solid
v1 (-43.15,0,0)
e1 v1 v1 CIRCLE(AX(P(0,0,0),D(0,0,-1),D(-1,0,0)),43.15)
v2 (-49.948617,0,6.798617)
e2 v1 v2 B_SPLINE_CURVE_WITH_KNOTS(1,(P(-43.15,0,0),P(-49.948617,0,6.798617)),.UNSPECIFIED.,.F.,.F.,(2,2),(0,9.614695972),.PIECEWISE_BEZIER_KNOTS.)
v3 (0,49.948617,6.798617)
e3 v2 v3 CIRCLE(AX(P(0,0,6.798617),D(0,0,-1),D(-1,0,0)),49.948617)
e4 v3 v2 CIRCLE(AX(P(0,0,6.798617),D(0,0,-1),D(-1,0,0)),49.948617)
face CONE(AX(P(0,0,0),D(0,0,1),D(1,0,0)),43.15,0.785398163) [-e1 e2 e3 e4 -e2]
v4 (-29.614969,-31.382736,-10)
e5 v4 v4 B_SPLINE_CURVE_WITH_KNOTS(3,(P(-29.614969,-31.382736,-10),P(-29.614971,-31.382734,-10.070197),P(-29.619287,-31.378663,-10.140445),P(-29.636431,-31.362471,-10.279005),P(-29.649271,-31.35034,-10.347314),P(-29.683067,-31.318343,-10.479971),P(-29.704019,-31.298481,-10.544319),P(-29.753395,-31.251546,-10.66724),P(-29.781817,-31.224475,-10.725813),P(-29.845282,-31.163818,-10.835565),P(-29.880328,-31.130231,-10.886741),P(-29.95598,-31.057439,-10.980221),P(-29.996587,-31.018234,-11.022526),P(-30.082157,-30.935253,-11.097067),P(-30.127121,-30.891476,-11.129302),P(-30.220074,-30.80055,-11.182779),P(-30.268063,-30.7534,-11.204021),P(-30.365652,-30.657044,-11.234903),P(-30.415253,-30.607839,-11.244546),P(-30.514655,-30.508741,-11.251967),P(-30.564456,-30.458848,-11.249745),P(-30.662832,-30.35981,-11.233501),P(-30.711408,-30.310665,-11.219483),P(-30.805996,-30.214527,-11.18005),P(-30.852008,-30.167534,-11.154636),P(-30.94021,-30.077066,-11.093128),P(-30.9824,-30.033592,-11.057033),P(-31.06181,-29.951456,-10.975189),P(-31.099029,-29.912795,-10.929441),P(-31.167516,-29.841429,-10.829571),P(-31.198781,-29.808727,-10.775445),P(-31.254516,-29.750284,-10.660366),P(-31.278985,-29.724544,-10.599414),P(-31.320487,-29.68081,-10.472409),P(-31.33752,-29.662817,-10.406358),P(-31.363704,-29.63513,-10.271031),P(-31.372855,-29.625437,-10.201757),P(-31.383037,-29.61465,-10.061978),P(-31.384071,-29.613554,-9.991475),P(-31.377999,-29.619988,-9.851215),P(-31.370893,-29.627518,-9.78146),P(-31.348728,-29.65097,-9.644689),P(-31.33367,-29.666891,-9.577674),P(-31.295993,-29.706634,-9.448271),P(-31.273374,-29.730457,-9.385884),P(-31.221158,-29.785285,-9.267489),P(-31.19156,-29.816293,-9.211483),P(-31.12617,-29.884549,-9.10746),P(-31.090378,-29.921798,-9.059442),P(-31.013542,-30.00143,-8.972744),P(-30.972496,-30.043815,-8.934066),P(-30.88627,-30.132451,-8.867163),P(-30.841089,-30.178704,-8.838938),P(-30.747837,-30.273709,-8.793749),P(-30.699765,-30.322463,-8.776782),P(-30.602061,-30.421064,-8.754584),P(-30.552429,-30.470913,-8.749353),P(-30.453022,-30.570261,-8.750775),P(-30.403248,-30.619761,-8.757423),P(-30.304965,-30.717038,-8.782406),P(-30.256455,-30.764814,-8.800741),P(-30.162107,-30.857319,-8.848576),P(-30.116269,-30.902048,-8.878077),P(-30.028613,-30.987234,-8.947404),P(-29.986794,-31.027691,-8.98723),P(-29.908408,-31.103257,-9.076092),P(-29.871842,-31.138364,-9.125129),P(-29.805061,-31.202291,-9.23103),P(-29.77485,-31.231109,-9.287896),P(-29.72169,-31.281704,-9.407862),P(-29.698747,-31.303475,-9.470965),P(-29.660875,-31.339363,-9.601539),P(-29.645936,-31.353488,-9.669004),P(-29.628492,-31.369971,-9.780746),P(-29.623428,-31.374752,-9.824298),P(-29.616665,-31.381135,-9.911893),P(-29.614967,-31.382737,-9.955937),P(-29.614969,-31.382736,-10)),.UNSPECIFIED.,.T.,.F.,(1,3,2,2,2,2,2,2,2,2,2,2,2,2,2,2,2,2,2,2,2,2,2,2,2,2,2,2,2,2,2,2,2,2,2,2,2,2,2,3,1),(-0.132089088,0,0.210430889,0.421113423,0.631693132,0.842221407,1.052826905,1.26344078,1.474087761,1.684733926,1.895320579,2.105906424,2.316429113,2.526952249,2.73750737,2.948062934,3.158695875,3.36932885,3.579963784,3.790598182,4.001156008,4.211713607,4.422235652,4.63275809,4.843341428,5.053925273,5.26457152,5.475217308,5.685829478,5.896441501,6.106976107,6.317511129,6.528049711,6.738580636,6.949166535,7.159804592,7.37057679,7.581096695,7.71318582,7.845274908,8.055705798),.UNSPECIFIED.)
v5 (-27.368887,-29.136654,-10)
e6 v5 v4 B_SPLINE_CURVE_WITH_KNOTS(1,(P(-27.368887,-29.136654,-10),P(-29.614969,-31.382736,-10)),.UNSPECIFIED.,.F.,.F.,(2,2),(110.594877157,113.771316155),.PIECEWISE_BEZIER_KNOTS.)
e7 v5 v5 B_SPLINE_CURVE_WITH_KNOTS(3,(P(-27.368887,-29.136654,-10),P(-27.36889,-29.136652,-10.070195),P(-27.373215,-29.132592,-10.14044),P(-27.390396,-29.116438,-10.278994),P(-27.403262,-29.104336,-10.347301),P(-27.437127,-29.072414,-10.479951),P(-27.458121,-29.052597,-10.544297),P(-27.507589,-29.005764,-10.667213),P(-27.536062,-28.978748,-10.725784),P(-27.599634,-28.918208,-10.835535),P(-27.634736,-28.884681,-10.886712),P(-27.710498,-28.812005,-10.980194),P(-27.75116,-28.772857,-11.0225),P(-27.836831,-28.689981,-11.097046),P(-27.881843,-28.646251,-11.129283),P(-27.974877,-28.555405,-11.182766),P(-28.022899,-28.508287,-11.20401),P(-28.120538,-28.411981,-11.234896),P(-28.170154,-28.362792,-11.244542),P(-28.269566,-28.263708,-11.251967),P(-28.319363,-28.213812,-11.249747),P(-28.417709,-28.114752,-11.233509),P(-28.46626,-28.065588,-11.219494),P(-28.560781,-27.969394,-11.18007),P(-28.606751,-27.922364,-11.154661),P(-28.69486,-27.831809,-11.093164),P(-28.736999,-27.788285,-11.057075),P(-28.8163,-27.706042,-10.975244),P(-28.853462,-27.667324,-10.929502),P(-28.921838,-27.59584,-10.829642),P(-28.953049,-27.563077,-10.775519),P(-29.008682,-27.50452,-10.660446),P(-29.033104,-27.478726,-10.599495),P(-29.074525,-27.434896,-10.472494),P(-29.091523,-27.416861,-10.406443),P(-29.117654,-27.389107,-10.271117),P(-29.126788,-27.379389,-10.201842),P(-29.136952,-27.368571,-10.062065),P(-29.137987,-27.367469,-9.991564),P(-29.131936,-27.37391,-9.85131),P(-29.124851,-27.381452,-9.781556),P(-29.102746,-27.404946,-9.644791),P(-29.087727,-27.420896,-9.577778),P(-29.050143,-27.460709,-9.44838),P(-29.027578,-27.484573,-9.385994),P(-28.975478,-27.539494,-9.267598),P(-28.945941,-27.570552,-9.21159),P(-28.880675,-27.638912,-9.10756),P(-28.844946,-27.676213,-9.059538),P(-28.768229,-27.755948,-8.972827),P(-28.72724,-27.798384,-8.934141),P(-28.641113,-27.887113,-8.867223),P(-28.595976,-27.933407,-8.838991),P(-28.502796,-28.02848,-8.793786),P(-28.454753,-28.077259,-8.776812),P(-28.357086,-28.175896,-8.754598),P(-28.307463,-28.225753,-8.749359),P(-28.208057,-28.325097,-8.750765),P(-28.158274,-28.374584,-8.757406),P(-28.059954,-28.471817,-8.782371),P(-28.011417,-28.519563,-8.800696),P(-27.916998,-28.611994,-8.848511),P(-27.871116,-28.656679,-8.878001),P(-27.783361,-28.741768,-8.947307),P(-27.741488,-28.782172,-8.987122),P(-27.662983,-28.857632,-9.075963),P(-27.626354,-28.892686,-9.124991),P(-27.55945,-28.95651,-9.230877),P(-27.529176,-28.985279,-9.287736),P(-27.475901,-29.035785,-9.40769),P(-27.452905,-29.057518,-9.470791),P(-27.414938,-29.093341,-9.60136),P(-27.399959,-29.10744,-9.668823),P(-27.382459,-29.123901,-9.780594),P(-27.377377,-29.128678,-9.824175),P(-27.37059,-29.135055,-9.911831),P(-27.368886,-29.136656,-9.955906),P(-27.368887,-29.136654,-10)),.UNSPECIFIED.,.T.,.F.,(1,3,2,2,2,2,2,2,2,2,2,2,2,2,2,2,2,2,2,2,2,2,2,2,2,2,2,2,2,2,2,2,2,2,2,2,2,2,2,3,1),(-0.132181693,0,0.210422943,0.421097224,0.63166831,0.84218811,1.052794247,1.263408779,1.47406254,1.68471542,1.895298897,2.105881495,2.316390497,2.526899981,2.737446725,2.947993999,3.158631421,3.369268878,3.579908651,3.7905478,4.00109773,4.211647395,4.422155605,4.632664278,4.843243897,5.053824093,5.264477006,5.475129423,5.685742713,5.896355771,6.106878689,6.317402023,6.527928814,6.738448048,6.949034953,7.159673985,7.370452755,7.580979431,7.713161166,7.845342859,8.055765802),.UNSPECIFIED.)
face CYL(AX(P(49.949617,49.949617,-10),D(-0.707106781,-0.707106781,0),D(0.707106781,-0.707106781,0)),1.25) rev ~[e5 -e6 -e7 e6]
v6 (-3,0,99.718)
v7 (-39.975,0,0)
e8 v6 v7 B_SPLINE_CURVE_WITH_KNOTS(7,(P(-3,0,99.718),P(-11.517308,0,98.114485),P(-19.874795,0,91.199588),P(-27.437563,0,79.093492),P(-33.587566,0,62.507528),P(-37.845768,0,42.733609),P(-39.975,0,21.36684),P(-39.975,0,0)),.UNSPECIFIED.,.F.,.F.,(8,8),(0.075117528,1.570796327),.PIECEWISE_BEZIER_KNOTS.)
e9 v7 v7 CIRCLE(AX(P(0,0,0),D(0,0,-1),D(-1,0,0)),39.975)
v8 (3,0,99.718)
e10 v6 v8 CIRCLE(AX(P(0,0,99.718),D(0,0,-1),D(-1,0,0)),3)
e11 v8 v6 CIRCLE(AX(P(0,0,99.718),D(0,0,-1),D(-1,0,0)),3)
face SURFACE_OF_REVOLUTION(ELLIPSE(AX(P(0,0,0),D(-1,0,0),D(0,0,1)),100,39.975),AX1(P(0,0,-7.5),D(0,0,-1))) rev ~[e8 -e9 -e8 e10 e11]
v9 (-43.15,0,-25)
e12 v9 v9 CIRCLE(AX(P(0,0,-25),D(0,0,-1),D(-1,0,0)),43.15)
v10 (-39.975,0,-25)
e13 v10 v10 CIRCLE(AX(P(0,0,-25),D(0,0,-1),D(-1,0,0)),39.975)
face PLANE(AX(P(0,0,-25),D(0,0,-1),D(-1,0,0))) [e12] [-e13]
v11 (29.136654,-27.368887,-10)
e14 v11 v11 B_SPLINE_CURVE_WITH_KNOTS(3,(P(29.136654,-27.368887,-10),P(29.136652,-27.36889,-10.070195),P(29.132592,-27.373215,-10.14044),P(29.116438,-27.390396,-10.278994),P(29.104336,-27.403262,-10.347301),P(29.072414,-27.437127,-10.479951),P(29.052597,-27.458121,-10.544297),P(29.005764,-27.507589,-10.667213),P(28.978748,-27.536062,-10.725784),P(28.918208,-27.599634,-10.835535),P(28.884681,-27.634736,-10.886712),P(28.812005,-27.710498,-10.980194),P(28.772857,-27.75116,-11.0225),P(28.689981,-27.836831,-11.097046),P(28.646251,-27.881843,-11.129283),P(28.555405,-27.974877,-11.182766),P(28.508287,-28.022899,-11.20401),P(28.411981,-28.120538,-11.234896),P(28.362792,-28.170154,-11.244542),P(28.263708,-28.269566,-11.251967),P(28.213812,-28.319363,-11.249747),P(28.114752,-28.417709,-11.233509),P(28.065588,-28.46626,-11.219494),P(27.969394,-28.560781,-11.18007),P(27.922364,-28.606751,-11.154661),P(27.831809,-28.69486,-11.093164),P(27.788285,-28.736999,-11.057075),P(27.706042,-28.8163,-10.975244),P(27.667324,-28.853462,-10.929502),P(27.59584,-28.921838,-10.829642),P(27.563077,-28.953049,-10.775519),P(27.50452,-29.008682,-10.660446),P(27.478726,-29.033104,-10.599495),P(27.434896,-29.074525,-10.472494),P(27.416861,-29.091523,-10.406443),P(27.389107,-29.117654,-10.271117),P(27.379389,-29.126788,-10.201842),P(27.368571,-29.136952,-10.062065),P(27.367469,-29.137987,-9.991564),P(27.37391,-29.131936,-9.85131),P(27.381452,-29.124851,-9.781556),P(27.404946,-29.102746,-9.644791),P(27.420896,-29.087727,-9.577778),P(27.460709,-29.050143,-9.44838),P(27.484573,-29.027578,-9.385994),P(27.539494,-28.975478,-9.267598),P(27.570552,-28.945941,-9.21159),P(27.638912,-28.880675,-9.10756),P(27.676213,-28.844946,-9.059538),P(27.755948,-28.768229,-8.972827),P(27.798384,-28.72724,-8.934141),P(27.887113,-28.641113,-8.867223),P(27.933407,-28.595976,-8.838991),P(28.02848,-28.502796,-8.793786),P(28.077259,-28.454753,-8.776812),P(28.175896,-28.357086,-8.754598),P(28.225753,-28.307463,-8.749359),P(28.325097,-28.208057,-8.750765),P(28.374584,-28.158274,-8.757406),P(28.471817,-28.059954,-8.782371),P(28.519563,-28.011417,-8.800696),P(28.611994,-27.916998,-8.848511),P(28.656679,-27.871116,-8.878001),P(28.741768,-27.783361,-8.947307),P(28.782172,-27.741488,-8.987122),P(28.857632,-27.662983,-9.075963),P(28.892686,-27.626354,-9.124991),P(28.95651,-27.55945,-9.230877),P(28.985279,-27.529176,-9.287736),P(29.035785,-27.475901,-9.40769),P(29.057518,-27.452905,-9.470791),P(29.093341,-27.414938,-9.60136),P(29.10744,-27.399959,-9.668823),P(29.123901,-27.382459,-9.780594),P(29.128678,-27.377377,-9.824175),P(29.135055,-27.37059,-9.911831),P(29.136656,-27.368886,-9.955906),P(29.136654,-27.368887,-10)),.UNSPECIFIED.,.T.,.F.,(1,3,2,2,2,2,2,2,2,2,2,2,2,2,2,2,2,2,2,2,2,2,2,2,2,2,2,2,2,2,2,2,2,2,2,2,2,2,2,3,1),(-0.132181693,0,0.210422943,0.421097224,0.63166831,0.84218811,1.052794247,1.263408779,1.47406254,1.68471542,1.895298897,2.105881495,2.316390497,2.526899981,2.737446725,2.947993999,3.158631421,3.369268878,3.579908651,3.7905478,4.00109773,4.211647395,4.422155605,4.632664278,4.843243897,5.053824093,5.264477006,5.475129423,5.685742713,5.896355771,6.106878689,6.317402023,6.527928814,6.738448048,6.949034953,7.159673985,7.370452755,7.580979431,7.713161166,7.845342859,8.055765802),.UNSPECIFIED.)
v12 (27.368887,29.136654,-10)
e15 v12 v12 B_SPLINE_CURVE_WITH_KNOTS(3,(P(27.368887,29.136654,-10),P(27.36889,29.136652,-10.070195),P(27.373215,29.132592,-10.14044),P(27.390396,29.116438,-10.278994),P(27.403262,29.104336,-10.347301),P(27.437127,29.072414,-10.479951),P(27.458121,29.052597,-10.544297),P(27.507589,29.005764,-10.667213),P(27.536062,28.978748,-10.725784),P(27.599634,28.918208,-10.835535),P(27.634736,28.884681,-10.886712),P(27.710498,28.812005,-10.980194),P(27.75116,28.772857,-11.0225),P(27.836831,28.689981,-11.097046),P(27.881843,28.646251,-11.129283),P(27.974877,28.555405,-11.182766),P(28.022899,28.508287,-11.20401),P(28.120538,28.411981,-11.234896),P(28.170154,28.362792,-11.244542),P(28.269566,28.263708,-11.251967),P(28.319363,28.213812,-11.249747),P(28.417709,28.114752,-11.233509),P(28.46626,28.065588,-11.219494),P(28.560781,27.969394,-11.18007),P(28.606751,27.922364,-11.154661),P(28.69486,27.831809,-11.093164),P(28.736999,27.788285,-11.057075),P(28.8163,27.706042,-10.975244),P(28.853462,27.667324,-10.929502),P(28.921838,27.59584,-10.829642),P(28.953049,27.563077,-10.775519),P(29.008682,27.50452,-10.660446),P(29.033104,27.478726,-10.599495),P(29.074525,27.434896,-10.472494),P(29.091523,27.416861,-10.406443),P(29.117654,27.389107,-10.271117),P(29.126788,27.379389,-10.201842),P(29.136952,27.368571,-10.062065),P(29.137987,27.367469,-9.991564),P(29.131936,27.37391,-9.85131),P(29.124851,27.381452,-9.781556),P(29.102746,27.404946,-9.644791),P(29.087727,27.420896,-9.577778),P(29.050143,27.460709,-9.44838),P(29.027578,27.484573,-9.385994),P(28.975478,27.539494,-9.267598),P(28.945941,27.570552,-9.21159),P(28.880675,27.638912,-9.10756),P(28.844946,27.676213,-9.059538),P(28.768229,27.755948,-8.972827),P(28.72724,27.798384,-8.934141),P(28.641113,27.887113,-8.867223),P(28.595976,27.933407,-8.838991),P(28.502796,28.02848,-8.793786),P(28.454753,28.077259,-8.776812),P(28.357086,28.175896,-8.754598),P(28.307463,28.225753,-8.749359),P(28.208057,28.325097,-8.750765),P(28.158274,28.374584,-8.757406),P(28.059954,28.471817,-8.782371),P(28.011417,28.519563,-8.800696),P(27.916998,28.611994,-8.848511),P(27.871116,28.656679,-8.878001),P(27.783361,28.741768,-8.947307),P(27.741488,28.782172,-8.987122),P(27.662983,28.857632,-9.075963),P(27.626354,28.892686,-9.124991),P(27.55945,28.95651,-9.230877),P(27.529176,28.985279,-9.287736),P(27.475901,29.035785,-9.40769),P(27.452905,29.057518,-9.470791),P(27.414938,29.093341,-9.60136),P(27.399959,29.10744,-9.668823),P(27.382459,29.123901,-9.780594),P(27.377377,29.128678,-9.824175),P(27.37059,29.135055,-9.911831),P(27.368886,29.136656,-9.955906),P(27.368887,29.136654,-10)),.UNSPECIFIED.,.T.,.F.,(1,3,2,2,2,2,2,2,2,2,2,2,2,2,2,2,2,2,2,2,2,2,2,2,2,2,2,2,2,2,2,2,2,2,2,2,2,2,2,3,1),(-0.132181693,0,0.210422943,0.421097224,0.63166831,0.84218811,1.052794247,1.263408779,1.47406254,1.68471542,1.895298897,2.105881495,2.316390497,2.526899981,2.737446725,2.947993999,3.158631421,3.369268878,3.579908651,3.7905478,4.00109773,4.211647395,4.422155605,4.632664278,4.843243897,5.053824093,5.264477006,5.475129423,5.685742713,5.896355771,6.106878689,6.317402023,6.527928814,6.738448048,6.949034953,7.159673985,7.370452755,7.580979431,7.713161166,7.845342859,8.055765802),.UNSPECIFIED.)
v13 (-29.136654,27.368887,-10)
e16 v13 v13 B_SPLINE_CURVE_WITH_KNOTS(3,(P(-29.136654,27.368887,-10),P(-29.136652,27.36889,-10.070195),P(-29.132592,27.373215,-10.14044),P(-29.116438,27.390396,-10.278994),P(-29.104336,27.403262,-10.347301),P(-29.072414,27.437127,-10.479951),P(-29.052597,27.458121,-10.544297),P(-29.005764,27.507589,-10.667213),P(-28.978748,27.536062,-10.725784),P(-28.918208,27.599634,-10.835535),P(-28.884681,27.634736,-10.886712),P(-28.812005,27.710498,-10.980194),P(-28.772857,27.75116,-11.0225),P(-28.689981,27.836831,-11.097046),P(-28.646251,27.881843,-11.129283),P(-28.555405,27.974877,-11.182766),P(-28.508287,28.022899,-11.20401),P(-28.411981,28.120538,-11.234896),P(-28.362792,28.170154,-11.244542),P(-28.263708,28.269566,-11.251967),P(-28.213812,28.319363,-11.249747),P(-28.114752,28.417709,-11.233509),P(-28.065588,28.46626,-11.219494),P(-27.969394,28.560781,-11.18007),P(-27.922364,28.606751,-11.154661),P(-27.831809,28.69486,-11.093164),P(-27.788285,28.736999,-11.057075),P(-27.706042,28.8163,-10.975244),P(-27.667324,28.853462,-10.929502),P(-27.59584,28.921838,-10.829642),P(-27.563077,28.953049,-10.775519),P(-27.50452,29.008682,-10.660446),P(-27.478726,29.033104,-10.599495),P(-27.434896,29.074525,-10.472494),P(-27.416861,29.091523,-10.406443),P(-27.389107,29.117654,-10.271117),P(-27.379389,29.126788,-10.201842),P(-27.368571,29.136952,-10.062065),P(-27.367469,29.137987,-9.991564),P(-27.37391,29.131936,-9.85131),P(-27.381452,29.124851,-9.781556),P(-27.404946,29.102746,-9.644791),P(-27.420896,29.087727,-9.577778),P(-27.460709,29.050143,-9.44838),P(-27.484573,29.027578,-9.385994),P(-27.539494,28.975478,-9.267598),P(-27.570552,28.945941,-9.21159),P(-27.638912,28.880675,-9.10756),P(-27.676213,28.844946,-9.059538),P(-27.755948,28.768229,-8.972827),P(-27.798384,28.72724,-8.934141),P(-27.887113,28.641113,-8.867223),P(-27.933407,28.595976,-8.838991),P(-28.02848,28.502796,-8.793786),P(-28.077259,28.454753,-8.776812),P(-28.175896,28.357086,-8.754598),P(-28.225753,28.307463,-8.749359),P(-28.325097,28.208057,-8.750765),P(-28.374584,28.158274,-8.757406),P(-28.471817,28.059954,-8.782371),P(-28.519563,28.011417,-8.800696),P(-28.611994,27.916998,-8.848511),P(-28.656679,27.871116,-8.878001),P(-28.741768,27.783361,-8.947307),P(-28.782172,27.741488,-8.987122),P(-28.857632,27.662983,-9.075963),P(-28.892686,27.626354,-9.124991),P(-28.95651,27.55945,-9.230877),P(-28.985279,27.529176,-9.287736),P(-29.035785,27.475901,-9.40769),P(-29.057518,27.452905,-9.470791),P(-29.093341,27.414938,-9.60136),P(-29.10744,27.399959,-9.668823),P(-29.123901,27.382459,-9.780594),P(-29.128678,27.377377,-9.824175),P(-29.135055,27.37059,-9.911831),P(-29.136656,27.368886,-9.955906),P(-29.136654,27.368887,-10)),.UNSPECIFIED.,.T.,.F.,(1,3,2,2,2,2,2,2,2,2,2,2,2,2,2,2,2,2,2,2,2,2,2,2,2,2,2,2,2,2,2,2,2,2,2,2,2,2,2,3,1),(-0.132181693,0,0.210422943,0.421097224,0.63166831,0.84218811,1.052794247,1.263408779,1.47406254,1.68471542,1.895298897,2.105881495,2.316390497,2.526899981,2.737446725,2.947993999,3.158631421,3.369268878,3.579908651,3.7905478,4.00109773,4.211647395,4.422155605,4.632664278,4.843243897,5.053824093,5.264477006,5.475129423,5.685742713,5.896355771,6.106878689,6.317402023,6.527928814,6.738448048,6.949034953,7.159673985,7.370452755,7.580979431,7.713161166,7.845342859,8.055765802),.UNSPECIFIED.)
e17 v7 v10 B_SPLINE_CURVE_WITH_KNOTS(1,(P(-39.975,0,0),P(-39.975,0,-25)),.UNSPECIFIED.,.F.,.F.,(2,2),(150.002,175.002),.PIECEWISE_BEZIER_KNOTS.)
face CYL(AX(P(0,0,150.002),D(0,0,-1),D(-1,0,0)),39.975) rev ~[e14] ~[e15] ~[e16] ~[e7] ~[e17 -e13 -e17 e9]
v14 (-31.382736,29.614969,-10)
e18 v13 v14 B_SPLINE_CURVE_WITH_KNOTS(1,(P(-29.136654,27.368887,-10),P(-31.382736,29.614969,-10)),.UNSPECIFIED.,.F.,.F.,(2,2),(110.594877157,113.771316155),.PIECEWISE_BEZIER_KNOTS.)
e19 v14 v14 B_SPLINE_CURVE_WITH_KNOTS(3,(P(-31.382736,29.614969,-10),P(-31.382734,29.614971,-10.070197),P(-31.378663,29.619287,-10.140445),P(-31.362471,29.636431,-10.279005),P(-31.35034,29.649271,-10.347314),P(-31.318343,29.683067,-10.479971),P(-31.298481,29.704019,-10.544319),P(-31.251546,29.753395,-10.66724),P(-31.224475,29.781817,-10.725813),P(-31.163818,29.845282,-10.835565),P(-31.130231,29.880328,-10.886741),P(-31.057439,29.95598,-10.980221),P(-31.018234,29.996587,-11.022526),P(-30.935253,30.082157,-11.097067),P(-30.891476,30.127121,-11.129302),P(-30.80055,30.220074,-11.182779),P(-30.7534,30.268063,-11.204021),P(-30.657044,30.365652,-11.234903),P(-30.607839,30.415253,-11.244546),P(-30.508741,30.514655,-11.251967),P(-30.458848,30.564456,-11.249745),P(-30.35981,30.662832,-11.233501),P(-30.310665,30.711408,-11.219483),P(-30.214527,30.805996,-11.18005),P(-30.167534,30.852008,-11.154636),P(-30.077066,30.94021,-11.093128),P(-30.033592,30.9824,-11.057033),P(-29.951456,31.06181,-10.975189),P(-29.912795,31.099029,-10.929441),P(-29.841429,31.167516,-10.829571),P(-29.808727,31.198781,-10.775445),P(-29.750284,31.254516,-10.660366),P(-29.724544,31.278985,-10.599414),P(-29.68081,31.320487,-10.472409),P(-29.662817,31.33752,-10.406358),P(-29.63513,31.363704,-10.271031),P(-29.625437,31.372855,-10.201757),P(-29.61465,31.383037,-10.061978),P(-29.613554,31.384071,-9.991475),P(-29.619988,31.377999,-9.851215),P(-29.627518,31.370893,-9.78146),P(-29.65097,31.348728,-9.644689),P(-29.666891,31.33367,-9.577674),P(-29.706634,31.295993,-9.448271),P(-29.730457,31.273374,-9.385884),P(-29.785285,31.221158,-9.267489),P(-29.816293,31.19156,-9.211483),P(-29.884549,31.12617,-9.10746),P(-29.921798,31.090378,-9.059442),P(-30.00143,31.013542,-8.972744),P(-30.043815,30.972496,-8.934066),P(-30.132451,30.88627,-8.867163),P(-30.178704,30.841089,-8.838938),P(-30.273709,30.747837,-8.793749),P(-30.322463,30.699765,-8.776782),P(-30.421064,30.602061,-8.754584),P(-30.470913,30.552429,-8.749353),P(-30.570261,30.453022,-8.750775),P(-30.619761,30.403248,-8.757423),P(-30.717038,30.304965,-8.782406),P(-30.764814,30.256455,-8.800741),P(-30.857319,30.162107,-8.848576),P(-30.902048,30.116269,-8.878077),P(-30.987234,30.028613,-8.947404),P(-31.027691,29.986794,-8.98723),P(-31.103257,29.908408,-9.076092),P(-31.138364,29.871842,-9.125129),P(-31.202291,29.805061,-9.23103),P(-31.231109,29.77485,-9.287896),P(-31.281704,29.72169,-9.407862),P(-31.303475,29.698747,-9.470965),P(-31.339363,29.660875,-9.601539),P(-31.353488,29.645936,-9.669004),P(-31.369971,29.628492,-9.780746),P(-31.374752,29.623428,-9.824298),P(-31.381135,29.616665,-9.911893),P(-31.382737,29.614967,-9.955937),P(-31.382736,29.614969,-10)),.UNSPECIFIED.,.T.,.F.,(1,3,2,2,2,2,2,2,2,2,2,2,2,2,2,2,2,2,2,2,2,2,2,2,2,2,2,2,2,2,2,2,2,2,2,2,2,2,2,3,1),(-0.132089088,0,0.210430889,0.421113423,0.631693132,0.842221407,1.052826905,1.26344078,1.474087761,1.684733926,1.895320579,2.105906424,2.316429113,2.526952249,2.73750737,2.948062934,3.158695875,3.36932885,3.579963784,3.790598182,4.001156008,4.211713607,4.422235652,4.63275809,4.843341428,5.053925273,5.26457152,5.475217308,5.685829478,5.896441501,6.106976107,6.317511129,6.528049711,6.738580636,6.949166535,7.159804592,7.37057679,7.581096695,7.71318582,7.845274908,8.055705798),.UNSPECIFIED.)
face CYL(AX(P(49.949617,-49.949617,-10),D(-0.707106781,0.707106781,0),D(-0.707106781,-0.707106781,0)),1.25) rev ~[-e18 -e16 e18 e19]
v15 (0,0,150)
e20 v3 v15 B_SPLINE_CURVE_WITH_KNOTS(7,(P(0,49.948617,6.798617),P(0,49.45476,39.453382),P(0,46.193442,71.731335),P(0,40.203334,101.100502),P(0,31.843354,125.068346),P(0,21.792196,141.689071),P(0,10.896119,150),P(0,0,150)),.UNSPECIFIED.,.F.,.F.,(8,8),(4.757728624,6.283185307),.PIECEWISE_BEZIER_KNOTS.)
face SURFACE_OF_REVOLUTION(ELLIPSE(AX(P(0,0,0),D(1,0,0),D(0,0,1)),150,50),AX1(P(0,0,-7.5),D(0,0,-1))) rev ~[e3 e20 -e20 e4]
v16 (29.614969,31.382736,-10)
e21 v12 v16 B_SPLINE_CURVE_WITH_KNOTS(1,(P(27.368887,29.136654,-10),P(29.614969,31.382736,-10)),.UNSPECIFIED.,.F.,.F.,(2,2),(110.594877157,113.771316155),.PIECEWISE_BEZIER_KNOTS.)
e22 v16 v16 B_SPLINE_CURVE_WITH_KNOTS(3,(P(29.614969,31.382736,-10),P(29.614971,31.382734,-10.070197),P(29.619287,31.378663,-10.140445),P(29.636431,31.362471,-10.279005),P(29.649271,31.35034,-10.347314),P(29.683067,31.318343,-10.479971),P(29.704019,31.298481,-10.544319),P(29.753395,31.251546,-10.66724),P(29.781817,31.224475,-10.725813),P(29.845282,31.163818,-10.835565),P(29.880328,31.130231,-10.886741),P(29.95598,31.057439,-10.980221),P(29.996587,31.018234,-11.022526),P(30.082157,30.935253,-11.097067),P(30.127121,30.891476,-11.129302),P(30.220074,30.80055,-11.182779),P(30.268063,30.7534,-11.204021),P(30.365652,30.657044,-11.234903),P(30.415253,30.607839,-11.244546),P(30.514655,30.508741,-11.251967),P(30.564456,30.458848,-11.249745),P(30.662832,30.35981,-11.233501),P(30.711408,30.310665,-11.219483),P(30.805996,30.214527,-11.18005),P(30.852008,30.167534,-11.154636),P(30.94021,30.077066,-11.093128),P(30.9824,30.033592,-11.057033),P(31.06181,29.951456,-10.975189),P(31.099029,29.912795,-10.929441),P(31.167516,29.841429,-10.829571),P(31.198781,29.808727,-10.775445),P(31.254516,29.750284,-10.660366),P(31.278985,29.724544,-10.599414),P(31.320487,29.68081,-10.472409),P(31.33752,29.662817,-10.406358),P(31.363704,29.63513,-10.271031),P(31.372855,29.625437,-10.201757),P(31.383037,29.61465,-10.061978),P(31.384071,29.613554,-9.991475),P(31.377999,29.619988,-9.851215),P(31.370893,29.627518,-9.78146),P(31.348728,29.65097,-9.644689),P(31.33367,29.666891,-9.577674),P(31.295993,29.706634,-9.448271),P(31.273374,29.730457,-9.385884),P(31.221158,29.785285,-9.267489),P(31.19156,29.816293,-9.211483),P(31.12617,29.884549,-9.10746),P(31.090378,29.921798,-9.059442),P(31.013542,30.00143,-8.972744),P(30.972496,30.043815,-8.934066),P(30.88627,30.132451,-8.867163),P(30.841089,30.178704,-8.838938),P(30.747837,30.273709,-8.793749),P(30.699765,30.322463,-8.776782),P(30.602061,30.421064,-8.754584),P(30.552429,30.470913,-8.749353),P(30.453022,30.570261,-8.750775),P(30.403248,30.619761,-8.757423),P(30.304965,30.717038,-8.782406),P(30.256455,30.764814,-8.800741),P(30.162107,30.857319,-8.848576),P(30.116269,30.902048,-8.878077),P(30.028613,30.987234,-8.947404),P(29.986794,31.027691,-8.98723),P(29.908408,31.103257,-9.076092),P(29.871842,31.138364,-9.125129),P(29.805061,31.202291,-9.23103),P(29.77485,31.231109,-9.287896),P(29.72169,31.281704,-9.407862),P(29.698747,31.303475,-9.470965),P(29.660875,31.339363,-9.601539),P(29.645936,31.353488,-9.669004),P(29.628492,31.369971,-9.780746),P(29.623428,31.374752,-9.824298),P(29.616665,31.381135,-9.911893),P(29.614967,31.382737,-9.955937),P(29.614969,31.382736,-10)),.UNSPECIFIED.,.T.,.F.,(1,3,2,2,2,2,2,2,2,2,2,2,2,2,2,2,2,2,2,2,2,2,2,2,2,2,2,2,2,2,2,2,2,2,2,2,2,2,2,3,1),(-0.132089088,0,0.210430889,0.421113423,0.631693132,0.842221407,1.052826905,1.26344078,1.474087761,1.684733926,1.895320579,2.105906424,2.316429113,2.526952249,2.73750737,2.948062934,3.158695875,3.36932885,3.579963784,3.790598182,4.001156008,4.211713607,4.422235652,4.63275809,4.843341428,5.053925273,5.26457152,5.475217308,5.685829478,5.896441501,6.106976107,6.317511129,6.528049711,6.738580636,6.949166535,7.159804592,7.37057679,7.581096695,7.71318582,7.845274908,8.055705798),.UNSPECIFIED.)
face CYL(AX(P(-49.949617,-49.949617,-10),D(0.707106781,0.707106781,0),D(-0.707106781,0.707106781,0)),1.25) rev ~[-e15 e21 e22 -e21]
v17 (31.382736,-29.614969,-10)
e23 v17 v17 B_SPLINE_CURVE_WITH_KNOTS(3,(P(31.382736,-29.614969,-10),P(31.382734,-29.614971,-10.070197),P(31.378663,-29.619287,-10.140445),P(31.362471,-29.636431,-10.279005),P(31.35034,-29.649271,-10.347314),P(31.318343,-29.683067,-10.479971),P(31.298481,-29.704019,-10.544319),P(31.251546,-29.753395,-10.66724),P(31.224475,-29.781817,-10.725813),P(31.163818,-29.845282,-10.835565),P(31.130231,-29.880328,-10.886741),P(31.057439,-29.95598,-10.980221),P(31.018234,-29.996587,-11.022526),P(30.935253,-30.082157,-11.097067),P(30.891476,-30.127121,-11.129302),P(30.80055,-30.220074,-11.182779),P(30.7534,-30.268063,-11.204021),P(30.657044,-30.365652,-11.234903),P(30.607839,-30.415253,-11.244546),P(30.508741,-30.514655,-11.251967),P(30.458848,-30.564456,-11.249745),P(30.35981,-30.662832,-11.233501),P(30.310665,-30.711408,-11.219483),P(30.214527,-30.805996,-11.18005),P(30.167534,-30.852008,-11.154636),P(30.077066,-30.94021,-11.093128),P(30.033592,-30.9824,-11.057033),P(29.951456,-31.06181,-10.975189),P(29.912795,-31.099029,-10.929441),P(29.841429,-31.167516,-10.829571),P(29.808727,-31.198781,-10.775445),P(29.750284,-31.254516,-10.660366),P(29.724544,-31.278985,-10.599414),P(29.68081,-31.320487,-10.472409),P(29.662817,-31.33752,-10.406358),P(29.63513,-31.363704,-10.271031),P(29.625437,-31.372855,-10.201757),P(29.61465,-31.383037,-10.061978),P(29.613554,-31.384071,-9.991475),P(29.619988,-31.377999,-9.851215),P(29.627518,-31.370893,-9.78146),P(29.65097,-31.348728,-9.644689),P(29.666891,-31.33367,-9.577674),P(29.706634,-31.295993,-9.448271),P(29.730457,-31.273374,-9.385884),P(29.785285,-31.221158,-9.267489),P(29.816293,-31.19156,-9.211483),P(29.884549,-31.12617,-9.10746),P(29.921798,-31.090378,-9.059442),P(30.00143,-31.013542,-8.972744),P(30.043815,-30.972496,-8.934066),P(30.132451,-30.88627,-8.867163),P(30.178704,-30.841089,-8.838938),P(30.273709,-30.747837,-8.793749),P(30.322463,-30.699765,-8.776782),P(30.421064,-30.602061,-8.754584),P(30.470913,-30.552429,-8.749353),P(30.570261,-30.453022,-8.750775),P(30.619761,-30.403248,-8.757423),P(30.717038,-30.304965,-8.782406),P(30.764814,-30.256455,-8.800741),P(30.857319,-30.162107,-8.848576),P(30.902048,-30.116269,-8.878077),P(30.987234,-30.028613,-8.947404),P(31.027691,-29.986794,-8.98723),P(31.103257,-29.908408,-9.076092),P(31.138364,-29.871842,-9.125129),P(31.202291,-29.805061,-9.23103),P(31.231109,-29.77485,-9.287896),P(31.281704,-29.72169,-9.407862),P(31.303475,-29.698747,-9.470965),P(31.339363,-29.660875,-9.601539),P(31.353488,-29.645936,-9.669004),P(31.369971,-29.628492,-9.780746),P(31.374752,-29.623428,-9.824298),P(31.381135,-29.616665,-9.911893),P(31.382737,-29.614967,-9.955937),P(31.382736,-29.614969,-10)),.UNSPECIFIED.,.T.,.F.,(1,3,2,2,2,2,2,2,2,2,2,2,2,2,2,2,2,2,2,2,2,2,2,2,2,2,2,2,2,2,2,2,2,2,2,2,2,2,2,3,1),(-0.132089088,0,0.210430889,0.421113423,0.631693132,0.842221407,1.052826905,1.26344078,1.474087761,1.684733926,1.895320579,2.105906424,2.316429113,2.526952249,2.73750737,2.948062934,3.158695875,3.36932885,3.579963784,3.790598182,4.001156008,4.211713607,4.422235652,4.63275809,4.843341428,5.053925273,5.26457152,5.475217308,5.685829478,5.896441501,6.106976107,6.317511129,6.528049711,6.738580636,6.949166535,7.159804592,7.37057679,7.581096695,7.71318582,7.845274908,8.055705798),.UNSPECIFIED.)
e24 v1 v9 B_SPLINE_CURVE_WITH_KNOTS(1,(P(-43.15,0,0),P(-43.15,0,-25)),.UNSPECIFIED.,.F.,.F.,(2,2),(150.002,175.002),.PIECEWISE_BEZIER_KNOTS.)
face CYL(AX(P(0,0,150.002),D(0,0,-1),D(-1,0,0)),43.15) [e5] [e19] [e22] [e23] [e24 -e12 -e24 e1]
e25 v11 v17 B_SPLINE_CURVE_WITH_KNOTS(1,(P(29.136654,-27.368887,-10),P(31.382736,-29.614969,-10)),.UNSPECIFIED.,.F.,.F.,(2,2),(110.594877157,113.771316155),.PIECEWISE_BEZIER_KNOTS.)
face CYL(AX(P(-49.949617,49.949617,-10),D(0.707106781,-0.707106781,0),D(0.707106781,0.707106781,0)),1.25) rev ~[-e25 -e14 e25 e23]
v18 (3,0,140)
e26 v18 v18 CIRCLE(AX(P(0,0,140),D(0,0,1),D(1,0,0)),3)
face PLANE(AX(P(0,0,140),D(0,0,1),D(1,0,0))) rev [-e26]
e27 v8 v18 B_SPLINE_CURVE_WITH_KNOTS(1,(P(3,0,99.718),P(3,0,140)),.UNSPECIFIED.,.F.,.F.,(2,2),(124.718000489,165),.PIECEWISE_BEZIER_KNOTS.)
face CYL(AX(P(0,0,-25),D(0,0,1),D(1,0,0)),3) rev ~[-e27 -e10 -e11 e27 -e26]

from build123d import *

# Parameters (mm, degrees)
UPPER_AIRFRAME_COUPLER_SKETCH_R      = 43.15
UPPER_AIRFRAME_COUPLER_SKETCH_R_2    = 39.975
UPPER_AIRFRAME_COUPLER_EXTRUDE_DEPTH = 25
SHEAR_PIN_BORE_CUT_REACH             = 190.276
SHEAR_PIN_BORE_CUT_END_RADIUS        = 39.975
SHEAR_PIN_BORE_SKETCH_R              = 1.25
SHEAR_PIN_PATTERN_COUNT              = 4
CUT_EXTRUDE2_DEPTH                   = 40
CUT_EXTRUDE2_DEPTH_BACK              = 144.578301529
SKETCH1_R                            = 3


with BuildPart() as part:
    # Ellipsoid Sketch → Ellipsoid Revolve (revolve)
    with BuildSketch(Plane(origin=(0, 0, 0), x_dir=(0, 0, -1), z_dir=(1, 0, 0))):
        with BuildLine():
            Line((-150, 0), (-100, 0))
            add(Edge.make_bspline(
                [(0, 39.975), (-100, 39.975), (-100, 0)],
                knots=[4.71238898, 4.71238898, 4.71238898, 6.283185307, 6.283185307, 6.283185307], degree=2, weights=[1, 0.707106781, 1]))
            Line((0, 39.975), (0, 50))
            add(Edge.make_bspline(
                [(0, 50), (-150, 50), (-150, 0)],
                knots=[4.71238898, 4.71238898, 4.71238898, 6.283185307, 6.283185307, 6.283185307], degree=2, weights=[1, 0.707106781, 1]))
        make_face()
    revolve(axis=Axis((0, 0, -7.5), (0, 0, 1)))

    # Upper Airframe Coupler Sketch → Upper Airframe Coupler Extrude (add)
    with BuildSketch(Plane(origin=(0, 0, 0), x_dir=(-1, 0, 0), z_dir=(0, 0, -1))):
        Circle(UPPER_AIRFRAME_COUPLER_SKETCH_R)
        Circle(UPPER_AIRFRAME_COUPLER_SKETCH_R_2, mode=Mode.SUBTRACT)
    extrude(amount=UPPER_AIRFRAME_COUPLER_EXTRUDE_DEPTH)

    # Upper Airframe Mate Chamfer: read off the stored shape, not the designer's step
    # Upper Airframe Mate Chamfer outline → Upper Airframe Mate Chamfer (revolve, cut)
    with BuildSketch(Plane.XZ):
        Polygon((49.948616721, 6.798616721), (43.15, 0), (50, 0), (50, 6.798616721), align=None)
    revolve(axis=Axis((0, 0, 0), (0, 0, 1)), mode=Mode.SUBTRACT)

    # Shear Pin Bore Cut: up to this cylinder (the profile starts outside it)
    shear_pin_bore_cut_end = Plane(origin=(0, 0, -10), z_dir=(0, 0, -1)) * Cylinder(SHEAR_PIN_BORE_CUT_END_RADIUS, 461.502, mode=Mode.PRIVATE)
    # Shear Pin Bore Sketch → Shear Pin Bore Cut (cut, up to the surface)
    with BuildSketch(Plane(origin=(30.511657608, -30.511657608, 0), x_dir=(-0.7071067811865475, -0.7071067811865477, 0), z_dir=(0.7071067811865477, -0.7071067811865475, 0)), mode=Mode.PRIVATE) as shear_pin_bore_cut_sk1:
        with Locations(Location((0, 10, 0), (0, 0, 180))):
            Circle(SHEAR_PIN_BORE_SKETCH_R)
    shear_pin_bore_cut_tool1 = extrude(shear_pin_bore_cut_sk1.sketch, amount=-SHEAR_PIN_BORE_CUT_REACH, mode=Mode.PRIVATE) - shear_pin_bore_cut_end
    shear_pin_bore_cut = shear_pin_bore_cut_tool1.solids().sort_by_distance((30.511658, -30.511658, -10))[0]
    add(shear_pin_bore_cut, mode=Mode.SUBTRACT)

    # Shear Pin Pattern: Shear Pin Bore Cut ×4 about axis
    shear_pin_pattern_axis = Axis((0, 0, 0), (0, 0, 1))
    for i in range(1, SHEAR_PIN_PATTERN_COUNT):
        add(shear_pin_bore_cut.rotate(shear_pin_pattern_axis, i * 360 / SHEAR_PIN_PATTERN_COUNT), mode=Mode.SUBTRACT)

    # Sketch1 → Cut-Extrude2 (cut, two sides: drawn at the far end of the back side and taken through both)
    with BuildSketch(Plane.XY.offset(100).offset(-CUT_EXTRUDE2_DEPTH_BACK)):
        Circle(SKETCH1_R)
    extrude(amount=CUT_EXTRUDE2_DEPTH + CUT_EXTRUDE2_DEPTH_BACK, mode=Mode.SUBTRACT)


solid = part.part
